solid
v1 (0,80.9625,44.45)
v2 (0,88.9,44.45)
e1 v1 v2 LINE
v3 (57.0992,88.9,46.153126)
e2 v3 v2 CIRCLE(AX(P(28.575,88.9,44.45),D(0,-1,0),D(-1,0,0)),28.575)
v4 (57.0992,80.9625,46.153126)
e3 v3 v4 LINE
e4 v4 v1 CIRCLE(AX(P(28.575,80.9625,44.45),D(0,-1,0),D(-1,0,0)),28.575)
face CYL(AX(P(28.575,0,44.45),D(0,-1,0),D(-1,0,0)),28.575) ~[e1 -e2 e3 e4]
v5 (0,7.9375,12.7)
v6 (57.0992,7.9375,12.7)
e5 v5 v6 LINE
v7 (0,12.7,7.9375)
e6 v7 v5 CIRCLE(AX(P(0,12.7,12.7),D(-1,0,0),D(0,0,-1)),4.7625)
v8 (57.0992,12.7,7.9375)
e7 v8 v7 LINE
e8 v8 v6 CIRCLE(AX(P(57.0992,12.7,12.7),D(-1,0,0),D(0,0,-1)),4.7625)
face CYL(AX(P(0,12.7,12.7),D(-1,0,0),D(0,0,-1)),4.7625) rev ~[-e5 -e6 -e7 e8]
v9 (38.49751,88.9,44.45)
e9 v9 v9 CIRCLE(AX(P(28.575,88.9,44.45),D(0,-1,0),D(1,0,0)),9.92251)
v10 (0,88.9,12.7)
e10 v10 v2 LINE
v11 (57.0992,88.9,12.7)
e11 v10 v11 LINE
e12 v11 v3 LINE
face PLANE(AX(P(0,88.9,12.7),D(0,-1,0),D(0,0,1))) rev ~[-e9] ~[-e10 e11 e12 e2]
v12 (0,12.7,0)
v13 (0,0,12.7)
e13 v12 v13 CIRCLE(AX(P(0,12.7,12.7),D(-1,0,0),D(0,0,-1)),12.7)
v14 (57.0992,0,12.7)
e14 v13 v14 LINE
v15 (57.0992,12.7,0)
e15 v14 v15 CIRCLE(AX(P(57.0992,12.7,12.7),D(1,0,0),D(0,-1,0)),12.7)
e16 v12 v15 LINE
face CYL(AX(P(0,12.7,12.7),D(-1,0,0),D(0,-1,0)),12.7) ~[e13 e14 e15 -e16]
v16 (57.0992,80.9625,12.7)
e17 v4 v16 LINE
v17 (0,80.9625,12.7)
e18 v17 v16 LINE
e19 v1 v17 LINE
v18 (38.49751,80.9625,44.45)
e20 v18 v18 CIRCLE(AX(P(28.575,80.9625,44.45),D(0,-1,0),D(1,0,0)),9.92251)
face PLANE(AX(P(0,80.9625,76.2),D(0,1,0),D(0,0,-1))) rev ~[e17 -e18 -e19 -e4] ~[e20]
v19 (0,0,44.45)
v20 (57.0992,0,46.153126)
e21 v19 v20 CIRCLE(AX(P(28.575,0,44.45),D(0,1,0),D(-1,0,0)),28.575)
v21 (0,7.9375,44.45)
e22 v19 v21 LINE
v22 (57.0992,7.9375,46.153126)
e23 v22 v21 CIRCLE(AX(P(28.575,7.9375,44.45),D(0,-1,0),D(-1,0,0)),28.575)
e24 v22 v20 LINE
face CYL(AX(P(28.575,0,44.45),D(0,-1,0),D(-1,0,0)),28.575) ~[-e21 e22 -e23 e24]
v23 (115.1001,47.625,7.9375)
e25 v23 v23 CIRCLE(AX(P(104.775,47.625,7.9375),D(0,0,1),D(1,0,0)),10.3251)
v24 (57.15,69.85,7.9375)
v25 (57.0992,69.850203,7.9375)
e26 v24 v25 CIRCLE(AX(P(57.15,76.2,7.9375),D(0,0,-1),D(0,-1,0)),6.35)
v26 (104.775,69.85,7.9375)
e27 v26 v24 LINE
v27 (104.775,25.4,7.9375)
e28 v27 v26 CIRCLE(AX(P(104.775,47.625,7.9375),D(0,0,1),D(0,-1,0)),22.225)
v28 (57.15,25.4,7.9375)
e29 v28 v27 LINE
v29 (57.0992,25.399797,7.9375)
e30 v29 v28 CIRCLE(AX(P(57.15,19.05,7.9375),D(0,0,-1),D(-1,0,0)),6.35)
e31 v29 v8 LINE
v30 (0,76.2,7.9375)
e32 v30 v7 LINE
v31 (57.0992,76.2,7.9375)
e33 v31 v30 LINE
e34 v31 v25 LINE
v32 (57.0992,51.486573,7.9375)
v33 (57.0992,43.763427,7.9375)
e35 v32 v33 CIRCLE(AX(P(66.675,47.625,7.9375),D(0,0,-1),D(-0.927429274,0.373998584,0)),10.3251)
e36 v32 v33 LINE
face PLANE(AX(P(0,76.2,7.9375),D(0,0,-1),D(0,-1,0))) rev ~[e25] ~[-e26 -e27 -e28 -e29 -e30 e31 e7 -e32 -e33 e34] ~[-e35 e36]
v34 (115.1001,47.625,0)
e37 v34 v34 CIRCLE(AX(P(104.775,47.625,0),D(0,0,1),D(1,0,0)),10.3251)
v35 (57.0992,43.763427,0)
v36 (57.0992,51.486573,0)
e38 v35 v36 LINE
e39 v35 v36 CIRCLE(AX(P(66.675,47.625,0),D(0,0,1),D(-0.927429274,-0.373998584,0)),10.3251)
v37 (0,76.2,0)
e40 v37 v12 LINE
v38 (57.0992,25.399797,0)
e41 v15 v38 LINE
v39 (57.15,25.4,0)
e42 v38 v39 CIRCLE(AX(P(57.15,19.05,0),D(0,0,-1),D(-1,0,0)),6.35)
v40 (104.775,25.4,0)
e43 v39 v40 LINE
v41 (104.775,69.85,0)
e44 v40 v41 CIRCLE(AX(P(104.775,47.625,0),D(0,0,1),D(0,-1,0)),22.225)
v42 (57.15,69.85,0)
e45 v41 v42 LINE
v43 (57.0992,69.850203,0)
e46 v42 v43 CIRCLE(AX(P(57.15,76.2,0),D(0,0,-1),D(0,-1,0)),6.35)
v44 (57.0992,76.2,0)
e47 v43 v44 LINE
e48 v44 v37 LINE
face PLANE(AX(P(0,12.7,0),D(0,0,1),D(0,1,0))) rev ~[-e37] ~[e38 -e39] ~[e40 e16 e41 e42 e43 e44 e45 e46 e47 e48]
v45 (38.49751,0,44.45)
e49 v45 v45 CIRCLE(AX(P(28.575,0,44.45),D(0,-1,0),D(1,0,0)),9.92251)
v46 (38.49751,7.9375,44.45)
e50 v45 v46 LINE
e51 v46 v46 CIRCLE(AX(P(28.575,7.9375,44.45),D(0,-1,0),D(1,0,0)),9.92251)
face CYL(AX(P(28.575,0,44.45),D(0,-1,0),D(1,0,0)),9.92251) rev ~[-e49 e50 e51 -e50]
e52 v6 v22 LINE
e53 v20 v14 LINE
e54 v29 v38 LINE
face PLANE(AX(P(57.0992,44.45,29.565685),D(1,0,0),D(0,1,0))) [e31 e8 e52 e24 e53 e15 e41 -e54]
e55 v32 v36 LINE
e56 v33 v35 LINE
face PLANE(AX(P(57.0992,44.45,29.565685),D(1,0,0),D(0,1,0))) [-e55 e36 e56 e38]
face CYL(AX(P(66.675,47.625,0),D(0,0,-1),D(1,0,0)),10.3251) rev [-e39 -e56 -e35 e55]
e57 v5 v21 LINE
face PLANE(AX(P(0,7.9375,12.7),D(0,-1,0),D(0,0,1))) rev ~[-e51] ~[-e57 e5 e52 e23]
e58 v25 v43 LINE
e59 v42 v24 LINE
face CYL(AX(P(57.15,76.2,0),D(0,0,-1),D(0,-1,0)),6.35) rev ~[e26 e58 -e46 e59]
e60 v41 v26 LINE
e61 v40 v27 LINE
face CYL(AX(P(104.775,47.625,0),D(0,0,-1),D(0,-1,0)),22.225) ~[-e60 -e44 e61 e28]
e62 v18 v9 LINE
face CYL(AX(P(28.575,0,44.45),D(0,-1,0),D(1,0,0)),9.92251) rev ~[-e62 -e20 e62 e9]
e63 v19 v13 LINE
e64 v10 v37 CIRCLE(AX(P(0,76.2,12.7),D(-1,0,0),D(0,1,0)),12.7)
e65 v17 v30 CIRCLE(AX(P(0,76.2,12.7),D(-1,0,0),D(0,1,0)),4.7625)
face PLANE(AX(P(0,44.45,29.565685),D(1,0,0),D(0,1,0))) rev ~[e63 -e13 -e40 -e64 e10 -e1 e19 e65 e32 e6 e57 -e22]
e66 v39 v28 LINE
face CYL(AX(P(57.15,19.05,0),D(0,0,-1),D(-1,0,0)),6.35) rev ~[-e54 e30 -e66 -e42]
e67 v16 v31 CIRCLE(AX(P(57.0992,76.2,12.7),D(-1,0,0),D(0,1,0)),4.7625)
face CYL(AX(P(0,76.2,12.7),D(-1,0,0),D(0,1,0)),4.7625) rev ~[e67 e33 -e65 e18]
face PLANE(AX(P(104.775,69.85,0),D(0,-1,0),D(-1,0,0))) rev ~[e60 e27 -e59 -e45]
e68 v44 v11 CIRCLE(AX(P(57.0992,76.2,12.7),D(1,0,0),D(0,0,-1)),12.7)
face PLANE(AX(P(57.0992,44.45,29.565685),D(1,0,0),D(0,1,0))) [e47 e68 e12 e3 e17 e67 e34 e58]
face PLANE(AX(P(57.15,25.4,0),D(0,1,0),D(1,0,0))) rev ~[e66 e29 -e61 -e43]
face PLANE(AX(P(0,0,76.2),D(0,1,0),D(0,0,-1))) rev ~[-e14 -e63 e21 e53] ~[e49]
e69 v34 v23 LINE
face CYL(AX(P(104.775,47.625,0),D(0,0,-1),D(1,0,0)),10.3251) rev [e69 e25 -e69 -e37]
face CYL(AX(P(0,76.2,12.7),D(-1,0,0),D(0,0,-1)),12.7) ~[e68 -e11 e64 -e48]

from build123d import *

# Parameters (mm, degrees)
F0_R     = 10.3251
F1_DEPTH = 7.9375
F3_DEPTH = 57.0992
F4_R     = 9.92251
F5_DEPTH = 88.901
F7_DEPTH = 127.001


with BuildPart() as f1:
    # F0 (on Top) → F1 (new body)
    with BuildSketch(Plane.XY):
        with BuildLine():
            Line((0, 88.9), (0, 0))
            Line((0, 0), (50.8, 0))
            Line((50.8, 0), (50.8, 19.05))
            ThreePointArc((50.8, 19.05), (52.6598719395, 23.5401280605), (57.15, 25.4))
            Line((57.15, 25.4), (104.775, 25.4))
            ThreePointArc((104.775, 25.4), (127, 47.625), (104.775, 69.85))
            Line((104.775, 69.85), (57.15, 69.85))
            ThreePointArc((57.15, 69.85), (52.6598719395, 71.7098719395), (50.8, 76.2))
            Line((50.8, 76.2), (50.8, 88.9))
            Line((50.8, 88.9), (0, 88.9))
        make_face()
        with Locations((66.675, 47.625)):
            Circle(F0_R, mode=Mode.SUBTRACT)
        with Locations((104.775, 47.625)):
            Circle(F0_R, mode=Mode.SUBTRACT)
    extrude(amount=F1_DEPTH)

    # F2 (on Right) → F3 (join)
    with BuildSketch(Plane.YZ):
        with BuildLine():
            Line((0, 76.2), (0, 12.7))
            ThreePointArc((0, 12.7), (3.7197438789, 3.7197438789), (12.7, 0))
            Line((12.7, 0), (76.2, 0))
            ThreePointArc((76.2, 0), (85.1802561211, 3.7197438789), (88.9, 12.7))
            Line((88.9, 12.7), (88.9, 76.2))
            Line((88.9, 76.2), (80.9625, 76.2))
            Line((80.9625, 76.2), (80.9625, 12.7))
            ThreePointArc((80.9625, 12.7), (79.5675960454, 9.3324039546), (76.2, 7.9375))
            Line((76.2, 7.9375), (12.7, 7.9375))
            ThreePointArc((12.7, 7.9375), (9.3324039546, 9.3324039546), (7.9375, 12.7))
            Line((7.9375, 12.7), (7.9375, 76.2))
            Line((7.9375, 76.2), (0, 76.2))
        make_face()
    extrude(amount=F3_DEPTH)

    # F4 (on Front) → F5 (cut, through all)
    with BuildSketch(Plane.XZ):
        with Locations((28.575, 44.45)):
            Circle(F4_R)
        with BuildLine():
            Line((57.1075950167, 46.0061640709), (57.1084559489, 42.9097024275))
            ThreePointArc((57.1084559489, 42.9097024275), (57.1499988955, 44.4579449194), (57.1075950167, 46.0061640709))
        make_face()
        with BuildLine():
            ThreePointArc((0, 44.45), (27.7966291375, 73.0143967869), (57.1075950167, 46.0061640709))
            Line((57.1075950167, 46.0061640709), (57.0992, 76.2))
            Line((57.0992, 76.2), (0, 76.2))
            Line((0, 76.2), (0, 44.45))
        make_face()
    extrude(amount=-F5_DEPTH, mode=Mode.SUBTRACT)

    # F6 (on Right) → F7 (cut, through all)
    with BuildSketch(Plane.YZ):
        with BuildLine():
            Line((0, 12.7), (0, 0))
            Line((0, 0), (12.7, 0))
            ThreePointArc((12.7, 0), (3.7197438789, 3.7197438789), (0, 12.7))
        make_face()
        with BuildLine():
            Line((76.2, 0), (88.9, 0))
            Line((88.9, 0), (88.9, 12.7))
            ThreePointArc((88.9, 12.7), (85.1802561211, 3.7197438789), (76.2, 0))
        make_face()
    extrude(amount=F7_DEPTH, mode=Mode.SUBTRACT)


solid = f1.part
